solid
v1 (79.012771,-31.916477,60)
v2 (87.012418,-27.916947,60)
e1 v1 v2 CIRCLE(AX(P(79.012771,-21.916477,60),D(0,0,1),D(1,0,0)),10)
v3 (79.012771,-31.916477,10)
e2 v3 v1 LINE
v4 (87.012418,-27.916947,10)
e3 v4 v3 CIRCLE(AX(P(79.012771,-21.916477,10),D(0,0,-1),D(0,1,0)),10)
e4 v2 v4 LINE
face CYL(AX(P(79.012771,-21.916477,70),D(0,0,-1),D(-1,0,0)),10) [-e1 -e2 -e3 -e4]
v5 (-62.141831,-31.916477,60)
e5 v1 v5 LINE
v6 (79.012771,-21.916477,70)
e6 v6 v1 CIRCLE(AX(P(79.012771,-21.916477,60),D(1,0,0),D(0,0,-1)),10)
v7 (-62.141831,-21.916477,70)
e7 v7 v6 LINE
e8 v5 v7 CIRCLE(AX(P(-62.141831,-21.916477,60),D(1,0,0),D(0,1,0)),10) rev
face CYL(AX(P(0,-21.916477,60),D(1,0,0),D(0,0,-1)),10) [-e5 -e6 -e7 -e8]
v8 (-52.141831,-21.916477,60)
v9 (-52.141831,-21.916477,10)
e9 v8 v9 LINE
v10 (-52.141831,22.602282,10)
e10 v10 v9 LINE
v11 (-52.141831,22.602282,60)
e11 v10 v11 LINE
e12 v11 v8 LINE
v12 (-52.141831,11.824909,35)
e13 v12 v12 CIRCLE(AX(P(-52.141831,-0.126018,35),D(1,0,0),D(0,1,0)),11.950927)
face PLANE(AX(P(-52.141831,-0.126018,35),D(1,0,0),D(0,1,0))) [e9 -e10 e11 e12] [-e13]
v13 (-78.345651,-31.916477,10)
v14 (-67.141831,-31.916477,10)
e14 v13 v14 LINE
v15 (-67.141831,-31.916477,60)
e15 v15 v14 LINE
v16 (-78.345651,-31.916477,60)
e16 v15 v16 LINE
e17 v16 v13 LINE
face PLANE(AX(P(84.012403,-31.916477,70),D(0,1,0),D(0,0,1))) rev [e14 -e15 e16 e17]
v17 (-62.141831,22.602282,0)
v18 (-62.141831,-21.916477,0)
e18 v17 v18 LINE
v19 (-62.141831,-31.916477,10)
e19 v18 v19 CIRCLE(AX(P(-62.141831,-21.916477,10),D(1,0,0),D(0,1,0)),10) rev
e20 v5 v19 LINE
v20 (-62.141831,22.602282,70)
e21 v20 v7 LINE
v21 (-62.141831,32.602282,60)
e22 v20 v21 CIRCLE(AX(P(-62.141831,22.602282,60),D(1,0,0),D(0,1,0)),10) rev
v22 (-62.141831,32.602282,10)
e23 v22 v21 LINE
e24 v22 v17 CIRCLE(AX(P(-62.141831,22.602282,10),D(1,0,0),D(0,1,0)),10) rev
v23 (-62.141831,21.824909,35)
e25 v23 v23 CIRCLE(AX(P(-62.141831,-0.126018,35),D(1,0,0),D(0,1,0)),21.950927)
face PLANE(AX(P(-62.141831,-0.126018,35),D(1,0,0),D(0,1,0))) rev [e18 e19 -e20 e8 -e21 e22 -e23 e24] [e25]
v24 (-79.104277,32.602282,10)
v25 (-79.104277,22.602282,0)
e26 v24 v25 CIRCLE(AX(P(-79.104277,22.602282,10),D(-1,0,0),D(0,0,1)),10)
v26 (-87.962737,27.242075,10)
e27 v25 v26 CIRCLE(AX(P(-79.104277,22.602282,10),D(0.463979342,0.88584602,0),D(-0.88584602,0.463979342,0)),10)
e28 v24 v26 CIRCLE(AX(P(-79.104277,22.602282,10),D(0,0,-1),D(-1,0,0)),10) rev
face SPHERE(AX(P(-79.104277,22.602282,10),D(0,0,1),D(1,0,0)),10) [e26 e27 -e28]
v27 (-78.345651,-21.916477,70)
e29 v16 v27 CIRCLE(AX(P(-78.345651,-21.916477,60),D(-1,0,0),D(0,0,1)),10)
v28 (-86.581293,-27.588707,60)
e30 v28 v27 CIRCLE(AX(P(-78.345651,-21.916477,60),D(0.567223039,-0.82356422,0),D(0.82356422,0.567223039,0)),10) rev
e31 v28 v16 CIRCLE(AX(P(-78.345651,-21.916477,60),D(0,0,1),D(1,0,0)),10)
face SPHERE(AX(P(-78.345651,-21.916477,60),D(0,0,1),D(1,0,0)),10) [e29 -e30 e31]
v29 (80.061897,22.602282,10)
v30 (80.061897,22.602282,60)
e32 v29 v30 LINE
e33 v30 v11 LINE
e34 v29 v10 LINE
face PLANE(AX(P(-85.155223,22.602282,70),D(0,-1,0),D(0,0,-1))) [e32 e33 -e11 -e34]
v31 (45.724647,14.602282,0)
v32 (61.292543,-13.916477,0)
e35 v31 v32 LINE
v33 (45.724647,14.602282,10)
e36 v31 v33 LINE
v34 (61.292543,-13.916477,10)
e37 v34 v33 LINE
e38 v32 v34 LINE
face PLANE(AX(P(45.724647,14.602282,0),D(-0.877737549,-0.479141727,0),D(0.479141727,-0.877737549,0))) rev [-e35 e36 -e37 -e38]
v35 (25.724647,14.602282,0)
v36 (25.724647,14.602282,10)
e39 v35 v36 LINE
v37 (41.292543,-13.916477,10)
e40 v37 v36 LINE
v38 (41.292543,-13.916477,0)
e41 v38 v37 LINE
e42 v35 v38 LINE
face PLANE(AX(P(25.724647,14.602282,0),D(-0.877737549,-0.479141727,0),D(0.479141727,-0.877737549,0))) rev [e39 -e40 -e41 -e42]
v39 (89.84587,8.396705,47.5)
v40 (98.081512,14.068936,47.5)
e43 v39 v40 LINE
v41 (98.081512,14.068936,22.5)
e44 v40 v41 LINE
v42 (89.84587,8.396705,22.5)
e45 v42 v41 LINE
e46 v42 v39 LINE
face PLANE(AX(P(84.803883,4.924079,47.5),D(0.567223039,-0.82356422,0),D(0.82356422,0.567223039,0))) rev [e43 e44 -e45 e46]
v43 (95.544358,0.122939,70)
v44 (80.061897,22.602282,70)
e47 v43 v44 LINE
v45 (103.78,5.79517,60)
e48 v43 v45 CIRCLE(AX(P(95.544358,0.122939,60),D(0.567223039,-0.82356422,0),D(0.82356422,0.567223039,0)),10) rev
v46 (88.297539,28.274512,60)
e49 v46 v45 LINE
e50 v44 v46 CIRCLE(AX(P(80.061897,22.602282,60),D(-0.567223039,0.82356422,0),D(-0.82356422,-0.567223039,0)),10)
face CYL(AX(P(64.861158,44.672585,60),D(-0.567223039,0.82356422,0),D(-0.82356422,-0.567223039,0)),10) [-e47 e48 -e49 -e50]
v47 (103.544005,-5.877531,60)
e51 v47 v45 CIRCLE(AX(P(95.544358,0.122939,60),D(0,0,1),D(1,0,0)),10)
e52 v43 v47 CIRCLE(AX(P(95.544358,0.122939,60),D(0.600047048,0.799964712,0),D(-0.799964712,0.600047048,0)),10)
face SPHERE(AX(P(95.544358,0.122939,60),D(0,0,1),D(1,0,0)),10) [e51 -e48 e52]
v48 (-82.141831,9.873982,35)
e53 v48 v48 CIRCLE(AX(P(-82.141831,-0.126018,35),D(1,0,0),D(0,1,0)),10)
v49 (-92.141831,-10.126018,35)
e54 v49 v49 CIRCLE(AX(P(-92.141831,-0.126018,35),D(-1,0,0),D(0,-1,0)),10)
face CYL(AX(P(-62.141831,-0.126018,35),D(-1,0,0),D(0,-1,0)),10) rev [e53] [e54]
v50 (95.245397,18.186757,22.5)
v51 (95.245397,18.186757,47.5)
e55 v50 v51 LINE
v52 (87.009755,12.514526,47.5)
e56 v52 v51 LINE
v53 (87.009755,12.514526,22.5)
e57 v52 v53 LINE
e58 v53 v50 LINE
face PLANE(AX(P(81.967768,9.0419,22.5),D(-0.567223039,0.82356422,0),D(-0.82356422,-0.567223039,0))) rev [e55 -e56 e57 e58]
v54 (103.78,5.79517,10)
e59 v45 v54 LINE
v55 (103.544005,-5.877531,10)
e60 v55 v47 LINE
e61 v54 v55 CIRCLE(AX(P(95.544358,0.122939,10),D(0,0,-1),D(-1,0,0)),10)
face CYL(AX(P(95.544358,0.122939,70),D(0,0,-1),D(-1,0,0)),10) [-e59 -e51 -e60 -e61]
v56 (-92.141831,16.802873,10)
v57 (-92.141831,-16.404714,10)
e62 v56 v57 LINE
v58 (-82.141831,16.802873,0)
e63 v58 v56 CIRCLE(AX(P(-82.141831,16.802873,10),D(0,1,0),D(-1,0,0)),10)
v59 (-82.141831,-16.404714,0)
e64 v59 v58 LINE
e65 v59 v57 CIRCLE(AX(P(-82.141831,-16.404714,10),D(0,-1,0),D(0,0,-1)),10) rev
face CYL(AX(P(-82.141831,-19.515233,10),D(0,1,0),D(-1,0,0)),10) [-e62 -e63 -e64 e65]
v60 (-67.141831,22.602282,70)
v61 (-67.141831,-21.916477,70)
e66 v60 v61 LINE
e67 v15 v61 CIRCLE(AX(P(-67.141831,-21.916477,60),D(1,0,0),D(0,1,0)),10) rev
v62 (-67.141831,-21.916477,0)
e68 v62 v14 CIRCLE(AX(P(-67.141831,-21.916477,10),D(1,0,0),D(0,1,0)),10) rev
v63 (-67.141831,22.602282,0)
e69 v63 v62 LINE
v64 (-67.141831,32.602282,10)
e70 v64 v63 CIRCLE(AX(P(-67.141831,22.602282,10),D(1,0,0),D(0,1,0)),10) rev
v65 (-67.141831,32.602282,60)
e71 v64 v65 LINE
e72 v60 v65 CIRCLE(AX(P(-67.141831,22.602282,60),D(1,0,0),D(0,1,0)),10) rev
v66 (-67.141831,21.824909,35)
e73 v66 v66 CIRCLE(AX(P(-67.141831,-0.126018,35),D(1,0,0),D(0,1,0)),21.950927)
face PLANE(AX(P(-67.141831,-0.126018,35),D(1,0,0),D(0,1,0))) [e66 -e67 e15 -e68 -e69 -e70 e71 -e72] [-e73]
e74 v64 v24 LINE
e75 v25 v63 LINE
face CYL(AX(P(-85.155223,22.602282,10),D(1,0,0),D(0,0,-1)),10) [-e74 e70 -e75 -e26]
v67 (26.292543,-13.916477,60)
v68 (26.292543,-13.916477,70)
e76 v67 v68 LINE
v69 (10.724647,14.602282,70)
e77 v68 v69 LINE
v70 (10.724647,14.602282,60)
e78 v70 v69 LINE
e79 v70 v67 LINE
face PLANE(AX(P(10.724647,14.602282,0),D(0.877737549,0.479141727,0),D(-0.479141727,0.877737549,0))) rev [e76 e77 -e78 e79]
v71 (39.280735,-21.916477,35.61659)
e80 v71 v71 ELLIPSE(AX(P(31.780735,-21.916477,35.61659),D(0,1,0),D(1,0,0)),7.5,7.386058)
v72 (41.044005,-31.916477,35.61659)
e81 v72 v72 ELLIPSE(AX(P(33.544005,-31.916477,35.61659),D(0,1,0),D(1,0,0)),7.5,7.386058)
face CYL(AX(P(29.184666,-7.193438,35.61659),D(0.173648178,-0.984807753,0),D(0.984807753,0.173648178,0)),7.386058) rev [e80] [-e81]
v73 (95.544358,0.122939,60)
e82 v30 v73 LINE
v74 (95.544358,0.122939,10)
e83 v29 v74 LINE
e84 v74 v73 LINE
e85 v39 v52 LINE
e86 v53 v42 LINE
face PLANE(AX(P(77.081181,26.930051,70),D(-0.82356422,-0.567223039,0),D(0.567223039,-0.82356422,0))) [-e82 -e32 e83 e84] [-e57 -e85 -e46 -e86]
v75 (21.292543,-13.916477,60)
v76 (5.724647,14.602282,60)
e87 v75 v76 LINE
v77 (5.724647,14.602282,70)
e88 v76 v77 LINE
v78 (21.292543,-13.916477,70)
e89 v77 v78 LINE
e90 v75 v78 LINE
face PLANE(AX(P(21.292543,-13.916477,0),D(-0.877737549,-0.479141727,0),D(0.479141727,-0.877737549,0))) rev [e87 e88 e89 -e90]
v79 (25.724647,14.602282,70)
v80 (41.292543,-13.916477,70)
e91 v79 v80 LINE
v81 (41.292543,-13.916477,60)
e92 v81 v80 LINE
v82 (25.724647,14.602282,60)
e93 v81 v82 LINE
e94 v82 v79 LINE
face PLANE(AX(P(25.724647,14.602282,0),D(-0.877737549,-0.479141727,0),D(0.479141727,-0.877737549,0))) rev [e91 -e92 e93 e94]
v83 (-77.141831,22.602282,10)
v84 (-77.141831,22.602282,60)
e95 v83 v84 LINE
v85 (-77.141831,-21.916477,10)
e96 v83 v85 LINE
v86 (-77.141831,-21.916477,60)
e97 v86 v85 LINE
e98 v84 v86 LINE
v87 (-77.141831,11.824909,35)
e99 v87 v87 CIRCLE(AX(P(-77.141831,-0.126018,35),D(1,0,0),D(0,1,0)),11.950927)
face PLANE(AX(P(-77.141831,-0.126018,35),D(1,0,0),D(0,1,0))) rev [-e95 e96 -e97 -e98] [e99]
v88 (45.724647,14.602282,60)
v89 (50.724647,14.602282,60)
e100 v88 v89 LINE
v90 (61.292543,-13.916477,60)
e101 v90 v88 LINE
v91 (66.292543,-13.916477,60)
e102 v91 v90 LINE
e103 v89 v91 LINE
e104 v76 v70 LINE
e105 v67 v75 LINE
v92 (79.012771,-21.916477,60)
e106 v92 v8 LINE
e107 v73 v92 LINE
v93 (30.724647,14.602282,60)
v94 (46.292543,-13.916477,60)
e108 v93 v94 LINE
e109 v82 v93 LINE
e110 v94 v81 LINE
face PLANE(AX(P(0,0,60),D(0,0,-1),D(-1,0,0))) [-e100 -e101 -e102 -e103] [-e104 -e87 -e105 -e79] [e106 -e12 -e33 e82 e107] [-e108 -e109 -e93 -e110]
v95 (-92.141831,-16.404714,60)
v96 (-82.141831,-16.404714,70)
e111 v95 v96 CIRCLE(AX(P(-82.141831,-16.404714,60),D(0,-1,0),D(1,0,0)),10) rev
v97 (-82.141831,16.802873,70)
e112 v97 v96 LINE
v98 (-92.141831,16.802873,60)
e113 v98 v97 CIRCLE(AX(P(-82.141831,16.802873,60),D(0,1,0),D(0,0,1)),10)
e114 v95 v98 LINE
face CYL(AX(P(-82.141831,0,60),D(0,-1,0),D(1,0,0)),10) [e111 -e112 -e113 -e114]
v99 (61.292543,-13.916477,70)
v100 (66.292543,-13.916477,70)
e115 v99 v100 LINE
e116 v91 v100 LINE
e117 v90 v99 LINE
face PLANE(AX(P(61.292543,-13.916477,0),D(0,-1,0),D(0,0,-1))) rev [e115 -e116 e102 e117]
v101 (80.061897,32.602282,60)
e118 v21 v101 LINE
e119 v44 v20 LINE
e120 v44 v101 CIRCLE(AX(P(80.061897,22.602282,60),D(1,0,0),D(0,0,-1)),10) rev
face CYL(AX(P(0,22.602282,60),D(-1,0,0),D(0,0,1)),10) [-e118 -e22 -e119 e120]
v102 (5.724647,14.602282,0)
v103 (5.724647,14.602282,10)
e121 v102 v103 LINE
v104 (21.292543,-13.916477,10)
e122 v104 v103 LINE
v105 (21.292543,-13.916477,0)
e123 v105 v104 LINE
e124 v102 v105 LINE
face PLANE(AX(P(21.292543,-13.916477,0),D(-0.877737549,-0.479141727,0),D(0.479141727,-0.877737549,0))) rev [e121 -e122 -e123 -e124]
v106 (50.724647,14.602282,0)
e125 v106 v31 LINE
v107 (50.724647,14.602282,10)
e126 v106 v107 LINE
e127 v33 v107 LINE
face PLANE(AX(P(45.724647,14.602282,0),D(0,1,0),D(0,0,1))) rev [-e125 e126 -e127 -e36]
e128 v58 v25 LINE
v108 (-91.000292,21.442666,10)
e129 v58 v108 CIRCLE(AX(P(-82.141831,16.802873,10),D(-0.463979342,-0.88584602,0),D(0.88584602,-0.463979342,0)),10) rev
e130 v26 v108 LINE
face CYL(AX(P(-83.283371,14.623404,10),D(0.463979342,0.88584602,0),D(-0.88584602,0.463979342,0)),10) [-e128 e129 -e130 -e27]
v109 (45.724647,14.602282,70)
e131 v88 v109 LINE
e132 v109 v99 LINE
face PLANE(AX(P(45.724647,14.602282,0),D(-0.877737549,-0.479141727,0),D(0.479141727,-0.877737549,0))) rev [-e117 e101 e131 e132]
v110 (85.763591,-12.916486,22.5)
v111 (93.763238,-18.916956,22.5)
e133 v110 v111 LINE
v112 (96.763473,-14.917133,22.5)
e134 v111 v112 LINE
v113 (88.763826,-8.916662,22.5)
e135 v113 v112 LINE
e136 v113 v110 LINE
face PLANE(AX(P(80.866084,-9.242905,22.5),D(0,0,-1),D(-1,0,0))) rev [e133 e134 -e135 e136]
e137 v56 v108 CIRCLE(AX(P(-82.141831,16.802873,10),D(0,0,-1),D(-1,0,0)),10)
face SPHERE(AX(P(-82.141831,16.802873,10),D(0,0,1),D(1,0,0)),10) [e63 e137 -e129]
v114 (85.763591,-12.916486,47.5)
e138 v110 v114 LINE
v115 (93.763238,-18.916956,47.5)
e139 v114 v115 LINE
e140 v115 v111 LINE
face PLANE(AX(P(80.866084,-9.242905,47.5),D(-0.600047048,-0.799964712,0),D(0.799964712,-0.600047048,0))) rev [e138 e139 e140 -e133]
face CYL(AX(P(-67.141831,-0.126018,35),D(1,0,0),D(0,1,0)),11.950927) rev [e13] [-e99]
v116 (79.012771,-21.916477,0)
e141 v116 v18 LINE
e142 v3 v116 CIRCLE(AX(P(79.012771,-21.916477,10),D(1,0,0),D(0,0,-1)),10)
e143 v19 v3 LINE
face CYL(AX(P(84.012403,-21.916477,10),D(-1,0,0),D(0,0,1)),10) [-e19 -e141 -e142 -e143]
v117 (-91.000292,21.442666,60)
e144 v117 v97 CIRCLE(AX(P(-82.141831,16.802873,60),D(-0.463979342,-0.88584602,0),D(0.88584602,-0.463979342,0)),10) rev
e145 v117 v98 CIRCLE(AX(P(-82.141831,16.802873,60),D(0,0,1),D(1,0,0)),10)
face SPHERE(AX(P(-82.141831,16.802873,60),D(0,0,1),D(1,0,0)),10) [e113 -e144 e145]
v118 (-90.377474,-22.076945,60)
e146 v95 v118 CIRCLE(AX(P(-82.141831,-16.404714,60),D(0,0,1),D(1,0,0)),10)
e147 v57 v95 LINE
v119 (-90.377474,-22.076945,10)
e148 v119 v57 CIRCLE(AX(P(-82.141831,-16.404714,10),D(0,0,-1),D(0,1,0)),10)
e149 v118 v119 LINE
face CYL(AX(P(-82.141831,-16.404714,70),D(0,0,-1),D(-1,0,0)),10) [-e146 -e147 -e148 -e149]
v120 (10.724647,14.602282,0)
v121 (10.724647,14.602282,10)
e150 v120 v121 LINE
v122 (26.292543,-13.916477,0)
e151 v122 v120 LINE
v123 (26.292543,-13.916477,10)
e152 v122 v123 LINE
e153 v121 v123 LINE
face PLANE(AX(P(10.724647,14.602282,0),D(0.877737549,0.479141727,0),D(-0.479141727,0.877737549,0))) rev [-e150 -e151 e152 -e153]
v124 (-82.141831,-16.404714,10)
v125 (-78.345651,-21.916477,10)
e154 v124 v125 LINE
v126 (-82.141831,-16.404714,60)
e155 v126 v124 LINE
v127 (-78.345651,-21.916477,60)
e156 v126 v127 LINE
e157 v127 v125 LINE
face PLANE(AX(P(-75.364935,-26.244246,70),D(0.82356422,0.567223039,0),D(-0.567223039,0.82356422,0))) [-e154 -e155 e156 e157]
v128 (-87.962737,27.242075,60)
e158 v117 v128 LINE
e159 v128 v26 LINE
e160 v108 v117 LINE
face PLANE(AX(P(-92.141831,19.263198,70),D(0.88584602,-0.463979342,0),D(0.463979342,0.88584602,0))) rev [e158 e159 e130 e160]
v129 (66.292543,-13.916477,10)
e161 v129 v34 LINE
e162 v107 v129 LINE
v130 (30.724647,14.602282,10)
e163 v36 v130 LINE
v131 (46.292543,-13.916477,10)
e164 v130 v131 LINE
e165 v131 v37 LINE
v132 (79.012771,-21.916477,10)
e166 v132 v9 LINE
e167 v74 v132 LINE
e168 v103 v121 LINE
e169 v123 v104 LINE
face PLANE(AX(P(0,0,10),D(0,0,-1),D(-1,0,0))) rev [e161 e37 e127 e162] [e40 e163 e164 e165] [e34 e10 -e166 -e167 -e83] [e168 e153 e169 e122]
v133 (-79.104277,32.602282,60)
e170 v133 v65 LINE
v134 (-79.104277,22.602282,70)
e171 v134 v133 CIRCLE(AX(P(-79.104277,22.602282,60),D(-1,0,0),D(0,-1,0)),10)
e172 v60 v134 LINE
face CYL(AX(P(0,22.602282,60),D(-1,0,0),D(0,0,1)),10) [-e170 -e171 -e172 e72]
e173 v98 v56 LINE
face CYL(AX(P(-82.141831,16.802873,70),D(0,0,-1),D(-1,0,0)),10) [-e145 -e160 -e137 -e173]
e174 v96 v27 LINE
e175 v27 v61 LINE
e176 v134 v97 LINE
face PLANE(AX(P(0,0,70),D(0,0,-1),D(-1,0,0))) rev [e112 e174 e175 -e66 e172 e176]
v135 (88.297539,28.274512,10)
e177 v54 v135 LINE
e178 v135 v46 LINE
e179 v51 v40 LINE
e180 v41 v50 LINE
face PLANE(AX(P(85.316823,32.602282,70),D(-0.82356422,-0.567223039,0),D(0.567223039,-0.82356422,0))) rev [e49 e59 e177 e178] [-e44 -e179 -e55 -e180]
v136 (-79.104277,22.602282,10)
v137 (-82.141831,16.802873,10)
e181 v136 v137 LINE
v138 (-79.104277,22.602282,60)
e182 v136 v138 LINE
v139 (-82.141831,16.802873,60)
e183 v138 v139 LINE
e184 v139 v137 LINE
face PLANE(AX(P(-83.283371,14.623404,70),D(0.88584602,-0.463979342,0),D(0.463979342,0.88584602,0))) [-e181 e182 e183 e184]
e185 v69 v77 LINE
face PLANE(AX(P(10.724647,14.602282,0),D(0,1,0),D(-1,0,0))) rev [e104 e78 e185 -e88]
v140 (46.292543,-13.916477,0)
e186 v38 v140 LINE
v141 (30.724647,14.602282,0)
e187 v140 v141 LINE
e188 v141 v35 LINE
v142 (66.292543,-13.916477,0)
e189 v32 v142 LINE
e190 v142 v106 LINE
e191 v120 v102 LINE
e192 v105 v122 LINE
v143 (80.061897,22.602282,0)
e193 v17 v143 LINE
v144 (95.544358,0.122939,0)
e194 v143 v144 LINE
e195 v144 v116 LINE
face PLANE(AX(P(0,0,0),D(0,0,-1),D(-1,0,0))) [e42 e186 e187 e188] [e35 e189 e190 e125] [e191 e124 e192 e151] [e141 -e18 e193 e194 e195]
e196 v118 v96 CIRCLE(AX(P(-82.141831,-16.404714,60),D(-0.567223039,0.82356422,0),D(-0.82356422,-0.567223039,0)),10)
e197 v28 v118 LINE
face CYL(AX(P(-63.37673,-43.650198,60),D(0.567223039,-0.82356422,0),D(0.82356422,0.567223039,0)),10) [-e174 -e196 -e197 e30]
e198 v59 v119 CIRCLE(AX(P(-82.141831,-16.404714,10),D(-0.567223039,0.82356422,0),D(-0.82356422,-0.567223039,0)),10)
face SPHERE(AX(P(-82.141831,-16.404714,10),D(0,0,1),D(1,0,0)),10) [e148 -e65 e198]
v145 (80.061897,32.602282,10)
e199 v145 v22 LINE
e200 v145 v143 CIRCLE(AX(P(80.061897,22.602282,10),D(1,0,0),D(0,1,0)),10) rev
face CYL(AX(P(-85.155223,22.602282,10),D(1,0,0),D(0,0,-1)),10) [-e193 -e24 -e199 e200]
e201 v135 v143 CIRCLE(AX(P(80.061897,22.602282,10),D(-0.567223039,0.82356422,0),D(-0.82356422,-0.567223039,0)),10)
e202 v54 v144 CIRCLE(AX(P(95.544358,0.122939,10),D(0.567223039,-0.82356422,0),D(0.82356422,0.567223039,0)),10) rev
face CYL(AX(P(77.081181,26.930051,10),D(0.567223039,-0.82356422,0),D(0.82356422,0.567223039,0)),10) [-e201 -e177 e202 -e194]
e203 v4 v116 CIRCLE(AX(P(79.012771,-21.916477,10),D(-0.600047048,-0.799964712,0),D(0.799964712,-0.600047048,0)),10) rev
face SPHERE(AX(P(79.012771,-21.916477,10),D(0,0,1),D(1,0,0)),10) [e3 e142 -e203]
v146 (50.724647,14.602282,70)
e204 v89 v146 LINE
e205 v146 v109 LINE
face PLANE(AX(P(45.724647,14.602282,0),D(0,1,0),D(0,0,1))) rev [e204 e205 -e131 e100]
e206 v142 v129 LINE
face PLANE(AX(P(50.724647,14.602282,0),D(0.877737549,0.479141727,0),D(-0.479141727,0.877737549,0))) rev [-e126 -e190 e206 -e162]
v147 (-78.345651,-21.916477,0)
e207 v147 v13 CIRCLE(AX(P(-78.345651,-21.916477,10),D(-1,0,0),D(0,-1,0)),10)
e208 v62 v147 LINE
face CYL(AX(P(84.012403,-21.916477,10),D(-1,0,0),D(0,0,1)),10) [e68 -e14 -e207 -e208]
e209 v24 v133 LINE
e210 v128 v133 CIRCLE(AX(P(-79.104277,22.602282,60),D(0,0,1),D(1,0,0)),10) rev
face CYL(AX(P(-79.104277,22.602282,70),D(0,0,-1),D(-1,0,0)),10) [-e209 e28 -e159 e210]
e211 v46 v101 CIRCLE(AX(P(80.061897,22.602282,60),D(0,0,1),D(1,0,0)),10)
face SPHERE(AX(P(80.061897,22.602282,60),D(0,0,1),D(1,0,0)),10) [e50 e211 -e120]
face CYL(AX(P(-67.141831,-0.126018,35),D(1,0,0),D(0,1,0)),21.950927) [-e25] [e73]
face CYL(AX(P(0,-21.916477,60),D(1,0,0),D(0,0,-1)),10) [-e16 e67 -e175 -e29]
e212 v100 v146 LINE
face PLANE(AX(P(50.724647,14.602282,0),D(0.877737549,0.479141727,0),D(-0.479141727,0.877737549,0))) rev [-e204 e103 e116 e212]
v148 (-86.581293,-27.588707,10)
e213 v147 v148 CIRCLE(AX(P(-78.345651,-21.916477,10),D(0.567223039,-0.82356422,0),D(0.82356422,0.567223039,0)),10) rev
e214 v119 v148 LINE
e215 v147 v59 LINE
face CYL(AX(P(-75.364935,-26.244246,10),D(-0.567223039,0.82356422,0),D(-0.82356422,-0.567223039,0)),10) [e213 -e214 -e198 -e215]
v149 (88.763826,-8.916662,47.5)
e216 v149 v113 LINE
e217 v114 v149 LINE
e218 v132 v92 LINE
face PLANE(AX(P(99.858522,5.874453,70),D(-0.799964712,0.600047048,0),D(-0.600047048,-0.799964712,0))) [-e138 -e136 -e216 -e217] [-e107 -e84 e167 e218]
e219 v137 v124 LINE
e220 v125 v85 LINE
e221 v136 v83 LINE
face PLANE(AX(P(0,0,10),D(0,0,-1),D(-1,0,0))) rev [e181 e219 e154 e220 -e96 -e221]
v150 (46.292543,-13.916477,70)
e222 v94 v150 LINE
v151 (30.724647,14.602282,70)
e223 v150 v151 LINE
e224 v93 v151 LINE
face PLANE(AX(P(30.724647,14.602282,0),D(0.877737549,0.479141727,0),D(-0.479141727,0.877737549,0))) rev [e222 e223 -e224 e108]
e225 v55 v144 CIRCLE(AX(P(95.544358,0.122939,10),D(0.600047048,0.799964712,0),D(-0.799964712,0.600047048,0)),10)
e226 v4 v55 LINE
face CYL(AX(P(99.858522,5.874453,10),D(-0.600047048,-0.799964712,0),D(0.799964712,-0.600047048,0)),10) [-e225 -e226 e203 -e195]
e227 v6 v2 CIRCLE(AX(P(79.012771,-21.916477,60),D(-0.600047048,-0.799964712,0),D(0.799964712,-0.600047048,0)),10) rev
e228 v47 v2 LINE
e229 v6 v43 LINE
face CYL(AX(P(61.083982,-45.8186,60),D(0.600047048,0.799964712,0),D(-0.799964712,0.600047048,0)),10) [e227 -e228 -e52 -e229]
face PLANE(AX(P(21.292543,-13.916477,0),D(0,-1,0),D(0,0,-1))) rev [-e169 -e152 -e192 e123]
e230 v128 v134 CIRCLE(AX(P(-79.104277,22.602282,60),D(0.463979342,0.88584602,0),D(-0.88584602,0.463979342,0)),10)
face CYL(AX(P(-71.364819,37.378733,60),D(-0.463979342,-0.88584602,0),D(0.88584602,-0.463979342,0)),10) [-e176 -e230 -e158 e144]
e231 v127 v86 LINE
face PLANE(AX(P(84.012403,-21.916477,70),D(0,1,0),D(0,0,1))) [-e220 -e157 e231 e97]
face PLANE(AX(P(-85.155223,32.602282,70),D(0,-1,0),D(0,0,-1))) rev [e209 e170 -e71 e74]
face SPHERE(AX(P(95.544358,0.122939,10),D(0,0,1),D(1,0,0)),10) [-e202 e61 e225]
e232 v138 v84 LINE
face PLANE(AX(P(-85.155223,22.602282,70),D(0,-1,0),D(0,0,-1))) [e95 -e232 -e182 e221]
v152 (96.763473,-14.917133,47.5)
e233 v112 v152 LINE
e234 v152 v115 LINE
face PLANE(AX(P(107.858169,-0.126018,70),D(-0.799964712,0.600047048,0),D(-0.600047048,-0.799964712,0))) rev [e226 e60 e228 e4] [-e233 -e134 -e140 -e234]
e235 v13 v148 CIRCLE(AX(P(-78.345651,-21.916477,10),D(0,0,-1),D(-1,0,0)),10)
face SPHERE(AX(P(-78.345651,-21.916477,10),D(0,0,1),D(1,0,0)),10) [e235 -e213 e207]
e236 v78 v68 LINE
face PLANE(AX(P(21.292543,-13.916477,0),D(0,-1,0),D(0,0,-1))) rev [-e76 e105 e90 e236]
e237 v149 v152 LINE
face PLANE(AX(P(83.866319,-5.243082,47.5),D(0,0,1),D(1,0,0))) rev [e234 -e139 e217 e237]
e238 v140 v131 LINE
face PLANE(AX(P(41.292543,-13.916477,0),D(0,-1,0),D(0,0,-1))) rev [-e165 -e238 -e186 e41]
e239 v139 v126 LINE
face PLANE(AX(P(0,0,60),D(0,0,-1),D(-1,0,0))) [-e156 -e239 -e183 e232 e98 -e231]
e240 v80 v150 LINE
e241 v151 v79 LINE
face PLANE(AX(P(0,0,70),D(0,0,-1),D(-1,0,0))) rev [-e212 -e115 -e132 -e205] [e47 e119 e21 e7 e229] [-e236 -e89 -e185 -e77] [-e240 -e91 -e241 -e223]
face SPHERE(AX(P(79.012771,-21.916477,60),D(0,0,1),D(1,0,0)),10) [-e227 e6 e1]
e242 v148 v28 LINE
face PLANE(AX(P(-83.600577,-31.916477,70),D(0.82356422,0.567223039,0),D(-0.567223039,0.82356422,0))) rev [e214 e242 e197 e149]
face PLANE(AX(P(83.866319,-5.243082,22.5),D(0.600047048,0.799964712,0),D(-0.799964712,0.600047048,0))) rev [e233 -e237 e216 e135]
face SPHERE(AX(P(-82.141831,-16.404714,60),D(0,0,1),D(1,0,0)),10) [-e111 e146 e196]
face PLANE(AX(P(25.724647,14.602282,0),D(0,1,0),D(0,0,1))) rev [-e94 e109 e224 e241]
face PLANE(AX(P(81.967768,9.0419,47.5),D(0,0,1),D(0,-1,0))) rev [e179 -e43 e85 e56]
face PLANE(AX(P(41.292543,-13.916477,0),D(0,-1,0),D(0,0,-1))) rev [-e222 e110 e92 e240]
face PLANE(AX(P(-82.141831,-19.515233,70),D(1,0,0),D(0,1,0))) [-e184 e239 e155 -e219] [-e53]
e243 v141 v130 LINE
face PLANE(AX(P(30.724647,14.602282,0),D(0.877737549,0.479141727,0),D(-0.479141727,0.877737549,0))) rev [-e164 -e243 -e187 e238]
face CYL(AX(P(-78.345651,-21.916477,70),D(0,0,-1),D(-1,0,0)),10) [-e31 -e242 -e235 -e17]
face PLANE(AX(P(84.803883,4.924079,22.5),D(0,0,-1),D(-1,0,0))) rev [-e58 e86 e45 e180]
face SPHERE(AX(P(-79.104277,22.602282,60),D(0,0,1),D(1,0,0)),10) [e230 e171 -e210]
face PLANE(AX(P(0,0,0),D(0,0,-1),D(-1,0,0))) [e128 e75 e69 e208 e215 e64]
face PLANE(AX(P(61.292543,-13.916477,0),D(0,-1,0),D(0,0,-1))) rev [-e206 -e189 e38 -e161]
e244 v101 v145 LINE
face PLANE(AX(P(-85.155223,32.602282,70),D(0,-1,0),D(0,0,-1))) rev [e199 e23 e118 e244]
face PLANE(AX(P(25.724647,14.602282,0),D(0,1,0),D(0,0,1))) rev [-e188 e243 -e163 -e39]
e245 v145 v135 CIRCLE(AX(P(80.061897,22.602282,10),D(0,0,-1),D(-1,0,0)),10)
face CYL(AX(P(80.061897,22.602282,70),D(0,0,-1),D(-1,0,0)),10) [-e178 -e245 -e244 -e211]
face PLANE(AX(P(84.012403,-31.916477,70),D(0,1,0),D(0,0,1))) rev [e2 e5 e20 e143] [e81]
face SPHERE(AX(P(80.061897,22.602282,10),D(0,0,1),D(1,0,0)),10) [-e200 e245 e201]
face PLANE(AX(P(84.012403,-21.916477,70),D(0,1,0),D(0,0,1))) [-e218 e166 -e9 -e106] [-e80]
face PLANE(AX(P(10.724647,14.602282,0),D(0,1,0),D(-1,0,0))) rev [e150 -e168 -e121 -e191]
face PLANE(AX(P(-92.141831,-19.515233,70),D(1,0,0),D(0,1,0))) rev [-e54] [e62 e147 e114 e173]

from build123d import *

# Parameters (mm, degrees)
BOSS_EXTRUDE1_DEPTH = 70
FILLET1_R           = 10
SKETCH4_R           = 44.565838739
SKETCH4_R_2         = 21.950927137
CUT_EXTRUDE18_DEPTH = 5
SHELL2_START        = 10
SHELL2_DEPTH        = 50
SHELL2_START_2      = -77.141831355
SHELL2_2_OUTLINE_R  = 11.950927137
SHELL2_2_DEPTH      = 25
SKETCH2_R           = 10
CUT_EXTRUDE19_DEPTH = 30
SKETCH10_R          = 7.386058148
CUT_EXTRUDE22_DEPTH = 33
CUT_EXTRUDE23_DEPTH = 131.776604246
SKETCH16_W          = 25
SKETCH16_H          = 5
CUT_EXTRUDE25_DEPTH = 16.122153735
SKETCH17_W          = 25
SKETCH17_H          = 5
CUT_EXTRUDE26_DEPTH = 16.122153735


with BuildPart() as part:
    # Sketch1 → Boss-Extrude1 (new body)
    with BuildSketch(Plane.XY):
        Polygon((-85.15522278, 32.602281584), (85.31682344, 32.602281584), (107.858168645, -0.126017705), (84.012402994, -31.916476628), (-83.600577489, -31.916476628), (-92.141831355, -19.515233034), (-92.141831355, 19.263197625), align=None)
    extrude(amount=BOSS_EXTRUDE1_DEPTH)

    # Fillet1
    fillet1_edges = [part.edges().sort_by_distance(p)[0] for p in [
        (-88.648527067, 25.932739604, 0),
        (-85.15522278, 32.602281584, 35),
        (85.31682344, 32.602281584, 35),
        (107.858168645, -0.126017705, 35),
        (-87.871204422, -25.715854831, 70),
        (84.012402994, -31.916476628, 35),
        (-83.600577489, -31.916476628, 35),
        (-92.141831355, -19.515233034, 35),
        (-92.141831355, 19.263197625, 35),
        (0.205912752, -31.916476628, 70),
        (95.93528582, -16.021247166, 70),
        (96.587496042, 16.23813194, 70),
        (0.08080033, 32.602281584, 70),
        (-88.648527067, 25.932739604, 70),
        (0.08080033, 32.602281584, 0),
        (96.587496042, 16.23813194, 0),
        (95.93528582, -16.021247166, 0),
        (0.205912752, -31.916476628, 0),
        (-92.141831355, -0.126017705, 70),
        (-87.871204422, -25.715854831, 0),
        (-92.141831355, -0.126017705, 0),
    ]]
    fillet(fillet1_edges, radius=FILLET1_R)

    # Sketch4 → Cut-Extrude18 (cut)
    with BuildSketch(Plane(origin=(-62.141831355, 0, 0), x_dir=(0, 0, -1), z_dir=(1, 0, 0))):
        with Locations((-35, -0.126017705)):
            Circle(SKETCH4_R)
        with Locations(Location((-35, -0.126017705, 0), (0, 0, 90))):
            Circle(SKETCH4_R_2, mode=Mode.SUBTRACT)
    extrude(amount=-CUT_EXTRUDE18_DEPTH, mode=Mode.SUBTRACT)

    # Shell2: read off the stored shape, not the designer's step
    # Shell2 outline → Shell2 (cut)
    with BuildSketch(Plane.XY.offset(SHELL2_START)):
        Polygon((-78.345650785, -21.916476628), (-77.141831355, -21.916476628), (-77.141831355, 22.602281584), (-79.104276607, 22.602281584), (-82.141831355, 16.80287299), (-82.141831355, -16.404714454), align=None)
        Polygon((-52.141831355, -21.916476628), (79.012770562, -21.916476628), (95.544357754, 0.122939143), (80.061896735, 22.602281584), (-52.141831355, 22.602281584), align=None)
    extrude(amount=SHELL2_DEPTH, mode=Mode.SUBTRACT)

    # Shell2 2 outline → Shell2 2 (cut)
    with BuildSketch(Plane.YZ.offset(SHELL2_START_2)):
        with Locations((-0.126017705, 35)):
            Circle(SHELL2_2_OUTLINE_R)
    extrude(amount=SHELL2_2_DEPTH, mode=Mode.SUBTRACT)

    # Sketch2 → Cut-Extrude19 (cut)
    with BuildSketch(Plane.ZY.offset(92.141831355)):
        with Locations(Location((35, -0.126017705, 0), (0, 0, 270))):
            Circle(SKETCH2_R)
    extrude(amount=-CUT_EXTRUDE19_DEPTH, mode=Mode.SUBTRACT)

    # Sketch10 → Cut-Extrude22 (cut)
    with BuildSketch(Plane(origin=(7.840565514, -44.466056654, 0), x_dir=(0, 0, 1), z_dir=(0.17364817766693072, -0.984807753012208, 0))):
        with Locations(Location((35.616590305, -27.492158059, 0), (0, 0, 270))):
            Circle(SKETCH10_R)
    extrude(amount=-CUT_EXTRUDE22_DEPTH, mode=Mode.SUBTRACT)

    # Sketch11 → Cut-Extrude23 (cut, through all)
    with BuildSketch(Plane.XY.offset(70)):
        Polygon((25.724647203, 14.602281584), (30.724647203, 14.602281584), (46.292543401, -13.916476628), (41.292543401, -13.916476628), align=None)
        Polygon((21.292543401, -13.916476628), (26.292543401, -13.916476628), (10.724647203, 14.602281584), (5.724647203, 14.602281584), align=None)
        Polygon((45.724647203, 14.602281584), (61.292543401, -13.916476628), (66.292543401, -13.916476628), (50.724647203, 14.602281584), align=None)
    extrude(amount=-CUT_EXTRUDE23_DEPTH, mode=Mode.SUBTRACT)

    # Sketch16 → Cut-Extrude25 (cut)
    with BuildSketch(Plane(origin=(73.09679987, 50.344815805, 0), x_dir=(0, 0, -1), z_dir=(0.8235642198480575, 0.5672230388357482, 0))):
        with Locations((-35, -41.547421266)):
            Rectangle(SKETCH16_W, SKETCH16_H)
    extrude(amount=-CUT_EXTRUDE25_DEPTH, mode=Mode.SUBTRACT)

    # Sketch17 → Cut-Extrude26 (cut)
    with BuildSketch(Plane(origin=(69.08362881, -51.819070211, 0), x_dir=(0, 0, -1), z_dir=(0.7999647115864142, -0.600047048335766, 0))):
        with Locations((-35, 43.629456832)):
            Rectangle(SKETCH17_W, SKETCH17_H)
    extrude(amount=-CUT_EXTRUDE26_DEPTH, mode=Mode.SUBTRACT)


solid = part.part
